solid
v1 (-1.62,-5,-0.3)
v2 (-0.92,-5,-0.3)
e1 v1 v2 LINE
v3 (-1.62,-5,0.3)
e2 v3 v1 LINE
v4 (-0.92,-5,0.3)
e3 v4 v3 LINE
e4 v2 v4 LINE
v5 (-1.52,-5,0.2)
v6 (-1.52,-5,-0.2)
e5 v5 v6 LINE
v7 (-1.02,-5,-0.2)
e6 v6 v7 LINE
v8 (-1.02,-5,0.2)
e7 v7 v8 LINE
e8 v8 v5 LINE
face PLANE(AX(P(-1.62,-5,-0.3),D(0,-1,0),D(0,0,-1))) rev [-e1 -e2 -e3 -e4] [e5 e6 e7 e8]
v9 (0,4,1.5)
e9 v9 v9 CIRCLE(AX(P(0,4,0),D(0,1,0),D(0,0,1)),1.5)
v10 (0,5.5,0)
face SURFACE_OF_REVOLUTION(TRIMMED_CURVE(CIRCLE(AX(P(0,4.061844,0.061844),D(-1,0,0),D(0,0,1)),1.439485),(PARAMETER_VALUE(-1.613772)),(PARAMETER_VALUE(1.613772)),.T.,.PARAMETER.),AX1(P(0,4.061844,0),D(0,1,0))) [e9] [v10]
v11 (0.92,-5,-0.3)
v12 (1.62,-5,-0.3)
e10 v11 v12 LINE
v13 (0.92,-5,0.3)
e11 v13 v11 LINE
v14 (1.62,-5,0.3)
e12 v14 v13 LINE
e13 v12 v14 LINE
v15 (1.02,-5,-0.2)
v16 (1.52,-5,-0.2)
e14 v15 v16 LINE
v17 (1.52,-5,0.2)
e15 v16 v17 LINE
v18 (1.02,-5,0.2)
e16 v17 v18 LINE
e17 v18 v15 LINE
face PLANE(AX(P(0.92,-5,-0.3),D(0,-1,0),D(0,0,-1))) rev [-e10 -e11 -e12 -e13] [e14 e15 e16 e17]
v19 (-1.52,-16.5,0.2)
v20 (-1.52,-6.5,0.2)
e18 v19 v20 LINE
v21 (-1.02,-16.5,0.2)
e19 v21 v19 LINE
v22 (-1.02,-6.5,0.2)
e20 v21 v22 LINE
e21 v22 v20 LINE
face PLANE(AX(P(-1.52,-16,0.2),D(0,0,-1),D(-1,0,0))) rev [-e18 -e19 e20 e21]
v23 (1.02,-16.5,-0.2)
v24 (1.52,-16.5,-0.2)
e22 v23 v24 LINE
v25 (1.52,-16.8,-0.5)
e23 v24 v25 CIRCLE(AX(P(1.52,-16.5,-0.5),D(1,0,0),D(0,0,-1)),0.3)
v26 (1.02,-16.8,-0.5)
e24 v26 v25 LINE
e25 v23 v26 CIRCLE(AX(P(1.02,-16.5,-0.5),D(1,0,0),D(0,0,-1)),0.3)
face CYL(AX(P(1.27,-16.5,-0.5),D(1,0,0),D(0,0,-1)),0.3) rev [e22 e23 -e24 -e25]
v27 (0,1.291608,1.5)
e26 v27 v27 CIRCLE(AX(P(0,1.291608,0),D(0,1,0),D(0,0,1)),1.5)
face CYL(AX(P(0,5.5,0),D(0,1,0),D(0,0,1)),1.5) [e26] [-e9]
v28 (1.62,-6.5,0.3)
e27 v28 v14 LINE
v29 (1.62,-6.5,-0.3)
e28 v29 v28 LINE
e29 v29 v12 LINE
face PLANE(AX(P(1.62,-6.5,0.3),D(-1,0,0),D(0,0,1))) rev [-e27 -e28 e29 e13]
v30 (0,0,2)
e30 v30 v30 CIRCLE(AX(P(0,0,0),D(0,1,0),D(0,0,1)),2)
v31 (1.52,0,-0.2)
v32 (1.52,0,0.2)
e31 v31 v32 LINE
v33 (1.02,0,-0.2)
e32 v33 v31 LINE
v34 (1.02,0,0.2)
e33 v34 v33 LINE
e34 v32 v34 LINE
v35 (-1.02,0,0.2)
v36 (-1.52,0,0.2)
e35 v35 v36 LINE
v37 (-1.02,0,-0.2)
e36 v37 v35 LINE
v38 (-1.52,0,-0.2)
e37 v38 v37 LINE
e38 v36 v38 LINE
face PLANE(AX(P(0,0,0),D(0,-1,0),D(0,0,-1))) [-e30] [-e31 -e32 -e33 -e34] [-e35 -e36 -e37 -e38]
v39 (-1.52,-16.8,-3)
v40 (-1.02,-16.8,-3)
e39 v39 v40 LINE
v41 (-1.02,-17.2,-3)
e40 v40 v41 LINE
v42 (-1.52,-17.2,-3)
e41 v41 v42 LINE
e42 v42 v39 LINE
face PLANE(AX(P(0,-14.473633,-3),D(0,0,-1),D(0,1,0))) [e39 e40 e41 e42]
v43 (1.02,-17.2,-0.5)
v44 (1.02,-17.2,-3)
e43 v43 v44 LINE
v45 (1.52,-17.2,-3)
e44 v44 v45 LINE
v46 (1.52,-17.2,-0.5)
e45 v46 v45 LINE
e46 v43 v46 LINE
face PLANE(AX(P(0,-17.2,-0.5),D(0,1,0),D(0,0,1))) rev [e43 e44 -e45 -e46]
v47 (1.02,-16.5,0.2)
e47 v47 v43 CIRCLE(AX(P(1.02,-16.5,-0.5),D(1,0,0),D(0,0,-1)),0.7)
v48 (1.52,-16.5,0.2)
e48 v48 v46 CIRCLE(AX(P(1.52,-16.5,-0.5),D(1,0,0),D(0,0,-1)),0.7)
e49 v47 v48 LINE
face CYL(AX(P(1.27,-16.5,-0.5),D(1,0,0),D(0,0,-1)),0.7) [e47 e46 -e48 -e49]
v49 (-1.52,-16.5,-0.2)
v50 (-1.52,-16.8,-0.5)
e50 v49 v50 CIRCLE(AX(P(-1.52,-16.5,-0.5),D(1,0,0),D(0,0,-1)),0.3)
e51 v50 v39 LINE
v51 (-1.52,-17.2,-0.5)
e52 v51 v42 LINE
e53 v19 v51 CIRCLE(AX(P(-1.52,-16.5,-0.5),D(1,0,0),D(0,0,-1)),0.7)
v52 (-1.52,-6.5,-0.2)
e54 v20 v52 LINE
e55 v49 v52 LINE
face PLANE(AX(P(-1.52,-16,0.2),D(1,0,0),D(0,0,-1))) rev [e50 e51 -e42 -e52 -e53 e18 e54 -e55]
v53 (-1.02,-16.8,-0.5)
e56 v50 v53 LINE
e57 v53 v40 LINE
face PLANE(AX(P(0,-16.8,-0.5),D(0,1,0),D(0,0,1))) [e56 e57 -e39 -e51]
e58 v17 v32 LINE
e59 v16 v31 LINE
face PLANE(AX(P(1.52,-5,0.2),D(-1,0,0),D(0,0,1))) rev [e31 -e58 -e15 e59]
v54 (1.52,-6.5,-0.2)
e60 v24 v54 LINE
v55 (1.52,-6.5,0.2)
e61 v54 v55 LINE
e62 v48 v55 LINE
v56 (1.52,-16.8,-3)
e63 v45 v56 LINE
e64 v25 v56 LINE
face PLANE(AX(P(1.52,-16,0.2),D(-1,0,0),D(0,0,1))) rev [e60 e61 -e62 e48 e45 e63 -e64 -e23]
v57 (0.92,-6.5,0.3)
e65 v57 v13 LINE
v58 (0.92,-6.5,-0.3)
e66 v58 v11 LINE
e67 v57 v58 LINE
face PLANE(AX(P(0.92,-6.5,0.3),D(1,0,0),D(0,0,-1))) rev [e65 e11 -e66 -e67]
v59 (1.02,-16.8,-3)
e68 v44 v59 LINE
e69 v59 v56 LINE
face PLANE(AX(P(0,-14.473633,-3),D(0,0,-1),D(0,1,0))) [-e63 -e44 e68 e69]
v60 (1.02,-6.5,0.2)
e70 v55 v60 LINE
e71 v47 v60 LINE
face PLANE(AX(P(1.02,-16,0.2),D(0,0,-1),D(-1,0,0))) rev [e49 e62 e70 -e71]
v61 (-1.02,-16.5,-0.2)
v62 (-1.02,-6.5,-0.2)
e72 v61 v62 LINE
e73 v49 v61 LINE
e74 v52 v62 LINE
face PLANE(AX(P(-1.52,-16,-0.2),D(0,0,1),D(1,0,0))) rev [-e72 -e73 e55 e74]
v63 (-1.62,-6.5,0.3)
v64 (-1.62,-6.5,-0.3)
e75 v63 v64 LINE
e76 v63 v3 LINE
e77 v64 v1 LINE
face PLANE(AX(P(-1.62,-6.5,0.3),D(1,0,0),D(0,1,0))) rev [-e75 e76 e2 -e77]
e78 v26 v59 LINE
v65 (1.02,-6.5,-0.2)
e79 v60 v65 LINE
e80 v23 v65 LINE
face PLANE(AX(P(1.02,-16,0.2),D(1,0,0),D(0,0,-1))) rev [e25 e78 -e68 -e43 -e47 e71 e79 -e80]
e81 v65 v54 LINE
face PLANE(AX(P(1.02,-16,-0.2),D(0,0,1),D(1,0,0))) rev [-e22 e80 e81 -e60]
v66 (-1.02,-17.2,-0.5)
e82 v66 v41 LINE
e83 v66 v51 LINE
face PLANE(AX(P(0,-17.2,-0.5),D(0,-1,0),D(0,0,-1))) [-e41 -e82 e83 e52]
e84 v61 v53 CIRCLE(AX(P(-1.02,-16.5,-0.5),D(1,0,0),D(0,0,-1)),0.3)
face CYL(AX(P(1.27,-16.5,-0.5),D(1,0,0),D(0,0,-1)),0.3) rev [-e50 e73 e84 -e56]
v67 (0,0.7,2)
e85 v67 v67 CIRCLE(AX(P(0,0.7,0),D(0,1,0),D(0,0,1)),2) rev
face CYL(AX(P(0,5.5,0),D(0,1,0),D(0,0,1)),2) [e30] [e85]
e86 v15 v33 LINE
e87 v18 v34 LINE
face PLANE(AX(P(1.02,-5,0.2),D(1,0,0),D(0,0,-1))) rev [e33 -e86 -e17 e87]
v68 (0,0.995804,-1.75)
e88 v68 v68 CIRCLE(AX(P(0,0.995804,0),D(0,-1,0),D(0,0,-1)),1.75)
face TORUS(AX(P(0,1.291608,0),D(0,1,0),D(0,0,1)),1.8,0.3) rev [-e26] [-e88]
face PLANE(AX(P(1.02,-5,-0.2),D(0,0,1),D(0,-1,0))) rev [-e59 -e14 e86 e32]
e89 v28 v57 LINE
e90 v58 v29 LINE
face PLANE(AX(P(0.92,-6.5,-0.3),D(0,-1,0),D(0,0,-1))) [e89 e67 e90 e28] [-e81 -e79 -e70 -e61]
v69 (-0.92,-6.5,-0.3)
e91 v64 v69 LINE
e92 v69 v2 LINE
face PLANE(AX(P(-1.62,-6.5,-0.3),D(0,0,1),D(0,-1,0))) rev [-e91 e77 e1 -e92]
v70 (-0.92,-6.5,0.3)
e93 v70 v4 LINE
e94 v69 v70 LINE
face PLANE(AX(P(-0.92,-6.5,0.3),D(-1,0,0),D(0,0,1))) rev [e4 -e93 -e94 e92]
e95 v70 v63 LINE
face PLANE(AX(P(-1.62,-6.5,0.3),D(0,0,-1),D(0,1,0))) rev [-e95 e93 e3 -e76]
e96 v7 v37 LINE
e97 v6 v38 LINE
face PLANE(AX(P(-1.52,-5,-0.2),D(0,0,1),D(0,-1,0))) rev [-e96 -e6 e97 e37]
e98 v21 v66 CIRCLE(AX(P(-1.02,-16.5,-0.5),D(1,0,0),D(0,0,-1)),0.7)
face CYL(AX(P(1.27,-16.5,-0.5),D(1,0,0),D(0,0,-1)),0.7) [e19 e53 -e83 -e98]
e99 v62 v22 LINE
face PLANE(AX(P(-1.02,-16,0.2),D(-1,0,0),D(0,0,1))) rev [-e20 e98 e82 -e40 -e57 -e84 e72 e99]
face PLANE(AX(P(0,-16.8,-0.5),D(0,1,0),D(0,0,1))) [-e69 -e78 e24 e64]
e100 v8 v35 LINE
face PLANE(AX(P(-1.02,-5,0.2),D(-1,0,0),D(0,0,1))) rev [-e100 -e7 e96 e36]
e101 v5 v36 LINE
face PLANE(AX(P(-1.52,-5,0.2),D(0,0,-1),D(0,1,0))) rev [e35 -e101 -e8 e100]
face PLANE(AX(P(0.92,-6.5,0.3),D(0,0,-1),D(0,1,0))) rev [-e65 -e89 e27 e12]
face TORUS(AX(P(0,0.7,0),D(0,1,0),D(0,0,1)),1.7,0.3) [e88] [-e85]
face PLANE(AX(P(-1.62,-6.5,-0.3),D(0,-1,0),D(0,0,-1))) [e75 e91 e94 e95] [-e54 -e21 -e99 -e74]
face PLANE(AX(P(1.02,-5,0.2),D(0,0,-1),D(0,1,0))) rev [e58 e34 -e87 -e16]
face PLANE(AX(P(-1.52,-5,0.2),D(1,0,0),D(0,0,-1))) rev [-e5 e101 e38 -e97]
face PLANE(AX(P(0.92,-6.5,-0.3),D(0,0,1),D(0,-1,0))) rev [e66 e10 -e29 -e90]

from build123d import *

# Parameters (mm, degrees)
FILLET_1_R      = 0.3
FILLET_2_R      = 0.3
SKETCH_2_W      = 0.5
SKETCH_2_H      = 0.4
EXTRUDE_1_DEPTH = 5
SKETCH_3_W      = 0.7
SKETCH_3_H      = 0.6
EXTRUDE_2_DEPTH = 1.5
SKETCH_5_W      = 0.5
SKETCH_5_H      = 0.4
EXTRUDE_3_DEPTH = 9.5
SWEEP_START     = -1.52
SWEEP_2_DEPTH   = 0.5
SKETCH_7_262_W  = 0.5
SKETCH_7_262_H  = 0.4


# Read off the part's stored shape, not the designer's step: По траектории2
with BuildPart() as part:
    # Эскиз1 → Повернуть2 (revolve)
    with BuildSketch(Plane(origin=(0, 0, 0), x_dir=(0, 0, -1), z_dir=(1, 0, 0))):
        with BuildLine():
            Line((0, 0), (-2, 0))
            Line((-2, 0), (-2, 1))
            Line((-2, 1), (-1.5, 1))
            Line((-1.5, 1), (-1.5, 4))
            ThreePointArc((-1.5, 4), (-1.07971355, 5.07971355), (0, 5.5))
            Line((0, 5.5), (0, 0))
        make_face()
    revolve(axis=Axis((0, 5.5, 0), (0, -1, 0)))

    # Скругление1
    fillet_1_edges = [part.edges().sort_by_distance(p)[0] for p in [
        (0, 1, -2),
    ]]
    fillet(fillet_1_edges, radius=FILLET_1_R)

    # Скругление2
    fillet_2_edges = [part.edges().sort_by_distance(p)[0] for p in [
        (0, 1, -1.5),
    ]]
    fillet(fillet_2_edges, radius=FILLET_2_R)

    # Эскиз2 → Вытянуть1 (add)
    with BuildSketch(Plane.XZ):
        with Locations((-1.27, 0)):
            Rectangle(SKETCH_2_W, SKETCH_2_H)
        with Locations((1.27, 0)):
            Rectangle(SKETCH_2_W, SKETCH_2_H)
    extrude(amount=EXTRUDE_1_DEPTH)

    # Эскиз3 → Вытянуть2 (add)
    with BuildSketch(Plane.XZ.offset(5)):
        with Locations((-1.27, 0)):
            Rectangle(SKETCH_3_W, SKETCH_3_H)
        with Locations((1.27, 0)):
            Rectangle(SKETCH_3_W, SKETCH_3_H)
    extrude(amount=EXTRUDE_2_DEPTH)

    # Эскиз5 → Вытянуть3 (add)
    with BuildSketch(Plane.XZ.offset(6.5)):
        with Locations((-1.27, 0)):
            Rectangle(SKETCH_5_W, SKETCH_5_H)
        with Locations((1.27, 0)):
            Rectangle(SKETCH_5_W, SKETCH_5_H)
    extrude(amount=EXTRUDE_3_DEPTH)

    # По траектории2 outline → По траектории2 (add)
    with BuildSketch(Plane.YZ.offset(SWEEP_START)):
        with BuildLine():
            Line((-17.2, -3), (-16.8, -3))
            Line((-16.8, -3), (-16.8, -0.5))
            ThreePointArc((-16.8, -0.5), (-16.712132034, -0.287867966), (-16.5, -0.2))
            Line((-16.5, -0.2), (-16, -0.2))
            Line((-16, -0.2), (-16, 0.2))
            Line((-16, 0.2), (-16.5, 0.2))
            ThreePointArc((-16.5, 0.2), (-16.994974747, -0.005025253), (-17.2, -0.5))
            Line((-17.2, -0.5), (-17.2, -3))
        make_face()
    extrude(amount=SWEEP_2_DEPTH)

    # По траектории11: sweep along a curve in space
    with BuildLine() as sweep_11_path:
        Line((-1.27, -16, 0), (-1.27, -16.5, 0))
        ThreePointArc((-1.27, -16.5, 0), (-1.27, -16.853553391, -0.146446609), (-1.27, -17, -0.5))
        Line((-1.27, -17, -0.5), (-1.27, -17, -3))
    # Эскиз7<262> → По траектории11 (sweep)
    with BuildSketch(Plane.XZ.offset(16)):
        with Locations((-1.27, 0)):
            Rectangle(SKETCH_7_262_W, SKETCH_7_262_H)
        with Locations((1.27, 0)):
            Rectangle(SKETCH_7_262_W, SKETCH_7_262_H)
    sweep(path=sweep_11_path.line)


solid = part.part
